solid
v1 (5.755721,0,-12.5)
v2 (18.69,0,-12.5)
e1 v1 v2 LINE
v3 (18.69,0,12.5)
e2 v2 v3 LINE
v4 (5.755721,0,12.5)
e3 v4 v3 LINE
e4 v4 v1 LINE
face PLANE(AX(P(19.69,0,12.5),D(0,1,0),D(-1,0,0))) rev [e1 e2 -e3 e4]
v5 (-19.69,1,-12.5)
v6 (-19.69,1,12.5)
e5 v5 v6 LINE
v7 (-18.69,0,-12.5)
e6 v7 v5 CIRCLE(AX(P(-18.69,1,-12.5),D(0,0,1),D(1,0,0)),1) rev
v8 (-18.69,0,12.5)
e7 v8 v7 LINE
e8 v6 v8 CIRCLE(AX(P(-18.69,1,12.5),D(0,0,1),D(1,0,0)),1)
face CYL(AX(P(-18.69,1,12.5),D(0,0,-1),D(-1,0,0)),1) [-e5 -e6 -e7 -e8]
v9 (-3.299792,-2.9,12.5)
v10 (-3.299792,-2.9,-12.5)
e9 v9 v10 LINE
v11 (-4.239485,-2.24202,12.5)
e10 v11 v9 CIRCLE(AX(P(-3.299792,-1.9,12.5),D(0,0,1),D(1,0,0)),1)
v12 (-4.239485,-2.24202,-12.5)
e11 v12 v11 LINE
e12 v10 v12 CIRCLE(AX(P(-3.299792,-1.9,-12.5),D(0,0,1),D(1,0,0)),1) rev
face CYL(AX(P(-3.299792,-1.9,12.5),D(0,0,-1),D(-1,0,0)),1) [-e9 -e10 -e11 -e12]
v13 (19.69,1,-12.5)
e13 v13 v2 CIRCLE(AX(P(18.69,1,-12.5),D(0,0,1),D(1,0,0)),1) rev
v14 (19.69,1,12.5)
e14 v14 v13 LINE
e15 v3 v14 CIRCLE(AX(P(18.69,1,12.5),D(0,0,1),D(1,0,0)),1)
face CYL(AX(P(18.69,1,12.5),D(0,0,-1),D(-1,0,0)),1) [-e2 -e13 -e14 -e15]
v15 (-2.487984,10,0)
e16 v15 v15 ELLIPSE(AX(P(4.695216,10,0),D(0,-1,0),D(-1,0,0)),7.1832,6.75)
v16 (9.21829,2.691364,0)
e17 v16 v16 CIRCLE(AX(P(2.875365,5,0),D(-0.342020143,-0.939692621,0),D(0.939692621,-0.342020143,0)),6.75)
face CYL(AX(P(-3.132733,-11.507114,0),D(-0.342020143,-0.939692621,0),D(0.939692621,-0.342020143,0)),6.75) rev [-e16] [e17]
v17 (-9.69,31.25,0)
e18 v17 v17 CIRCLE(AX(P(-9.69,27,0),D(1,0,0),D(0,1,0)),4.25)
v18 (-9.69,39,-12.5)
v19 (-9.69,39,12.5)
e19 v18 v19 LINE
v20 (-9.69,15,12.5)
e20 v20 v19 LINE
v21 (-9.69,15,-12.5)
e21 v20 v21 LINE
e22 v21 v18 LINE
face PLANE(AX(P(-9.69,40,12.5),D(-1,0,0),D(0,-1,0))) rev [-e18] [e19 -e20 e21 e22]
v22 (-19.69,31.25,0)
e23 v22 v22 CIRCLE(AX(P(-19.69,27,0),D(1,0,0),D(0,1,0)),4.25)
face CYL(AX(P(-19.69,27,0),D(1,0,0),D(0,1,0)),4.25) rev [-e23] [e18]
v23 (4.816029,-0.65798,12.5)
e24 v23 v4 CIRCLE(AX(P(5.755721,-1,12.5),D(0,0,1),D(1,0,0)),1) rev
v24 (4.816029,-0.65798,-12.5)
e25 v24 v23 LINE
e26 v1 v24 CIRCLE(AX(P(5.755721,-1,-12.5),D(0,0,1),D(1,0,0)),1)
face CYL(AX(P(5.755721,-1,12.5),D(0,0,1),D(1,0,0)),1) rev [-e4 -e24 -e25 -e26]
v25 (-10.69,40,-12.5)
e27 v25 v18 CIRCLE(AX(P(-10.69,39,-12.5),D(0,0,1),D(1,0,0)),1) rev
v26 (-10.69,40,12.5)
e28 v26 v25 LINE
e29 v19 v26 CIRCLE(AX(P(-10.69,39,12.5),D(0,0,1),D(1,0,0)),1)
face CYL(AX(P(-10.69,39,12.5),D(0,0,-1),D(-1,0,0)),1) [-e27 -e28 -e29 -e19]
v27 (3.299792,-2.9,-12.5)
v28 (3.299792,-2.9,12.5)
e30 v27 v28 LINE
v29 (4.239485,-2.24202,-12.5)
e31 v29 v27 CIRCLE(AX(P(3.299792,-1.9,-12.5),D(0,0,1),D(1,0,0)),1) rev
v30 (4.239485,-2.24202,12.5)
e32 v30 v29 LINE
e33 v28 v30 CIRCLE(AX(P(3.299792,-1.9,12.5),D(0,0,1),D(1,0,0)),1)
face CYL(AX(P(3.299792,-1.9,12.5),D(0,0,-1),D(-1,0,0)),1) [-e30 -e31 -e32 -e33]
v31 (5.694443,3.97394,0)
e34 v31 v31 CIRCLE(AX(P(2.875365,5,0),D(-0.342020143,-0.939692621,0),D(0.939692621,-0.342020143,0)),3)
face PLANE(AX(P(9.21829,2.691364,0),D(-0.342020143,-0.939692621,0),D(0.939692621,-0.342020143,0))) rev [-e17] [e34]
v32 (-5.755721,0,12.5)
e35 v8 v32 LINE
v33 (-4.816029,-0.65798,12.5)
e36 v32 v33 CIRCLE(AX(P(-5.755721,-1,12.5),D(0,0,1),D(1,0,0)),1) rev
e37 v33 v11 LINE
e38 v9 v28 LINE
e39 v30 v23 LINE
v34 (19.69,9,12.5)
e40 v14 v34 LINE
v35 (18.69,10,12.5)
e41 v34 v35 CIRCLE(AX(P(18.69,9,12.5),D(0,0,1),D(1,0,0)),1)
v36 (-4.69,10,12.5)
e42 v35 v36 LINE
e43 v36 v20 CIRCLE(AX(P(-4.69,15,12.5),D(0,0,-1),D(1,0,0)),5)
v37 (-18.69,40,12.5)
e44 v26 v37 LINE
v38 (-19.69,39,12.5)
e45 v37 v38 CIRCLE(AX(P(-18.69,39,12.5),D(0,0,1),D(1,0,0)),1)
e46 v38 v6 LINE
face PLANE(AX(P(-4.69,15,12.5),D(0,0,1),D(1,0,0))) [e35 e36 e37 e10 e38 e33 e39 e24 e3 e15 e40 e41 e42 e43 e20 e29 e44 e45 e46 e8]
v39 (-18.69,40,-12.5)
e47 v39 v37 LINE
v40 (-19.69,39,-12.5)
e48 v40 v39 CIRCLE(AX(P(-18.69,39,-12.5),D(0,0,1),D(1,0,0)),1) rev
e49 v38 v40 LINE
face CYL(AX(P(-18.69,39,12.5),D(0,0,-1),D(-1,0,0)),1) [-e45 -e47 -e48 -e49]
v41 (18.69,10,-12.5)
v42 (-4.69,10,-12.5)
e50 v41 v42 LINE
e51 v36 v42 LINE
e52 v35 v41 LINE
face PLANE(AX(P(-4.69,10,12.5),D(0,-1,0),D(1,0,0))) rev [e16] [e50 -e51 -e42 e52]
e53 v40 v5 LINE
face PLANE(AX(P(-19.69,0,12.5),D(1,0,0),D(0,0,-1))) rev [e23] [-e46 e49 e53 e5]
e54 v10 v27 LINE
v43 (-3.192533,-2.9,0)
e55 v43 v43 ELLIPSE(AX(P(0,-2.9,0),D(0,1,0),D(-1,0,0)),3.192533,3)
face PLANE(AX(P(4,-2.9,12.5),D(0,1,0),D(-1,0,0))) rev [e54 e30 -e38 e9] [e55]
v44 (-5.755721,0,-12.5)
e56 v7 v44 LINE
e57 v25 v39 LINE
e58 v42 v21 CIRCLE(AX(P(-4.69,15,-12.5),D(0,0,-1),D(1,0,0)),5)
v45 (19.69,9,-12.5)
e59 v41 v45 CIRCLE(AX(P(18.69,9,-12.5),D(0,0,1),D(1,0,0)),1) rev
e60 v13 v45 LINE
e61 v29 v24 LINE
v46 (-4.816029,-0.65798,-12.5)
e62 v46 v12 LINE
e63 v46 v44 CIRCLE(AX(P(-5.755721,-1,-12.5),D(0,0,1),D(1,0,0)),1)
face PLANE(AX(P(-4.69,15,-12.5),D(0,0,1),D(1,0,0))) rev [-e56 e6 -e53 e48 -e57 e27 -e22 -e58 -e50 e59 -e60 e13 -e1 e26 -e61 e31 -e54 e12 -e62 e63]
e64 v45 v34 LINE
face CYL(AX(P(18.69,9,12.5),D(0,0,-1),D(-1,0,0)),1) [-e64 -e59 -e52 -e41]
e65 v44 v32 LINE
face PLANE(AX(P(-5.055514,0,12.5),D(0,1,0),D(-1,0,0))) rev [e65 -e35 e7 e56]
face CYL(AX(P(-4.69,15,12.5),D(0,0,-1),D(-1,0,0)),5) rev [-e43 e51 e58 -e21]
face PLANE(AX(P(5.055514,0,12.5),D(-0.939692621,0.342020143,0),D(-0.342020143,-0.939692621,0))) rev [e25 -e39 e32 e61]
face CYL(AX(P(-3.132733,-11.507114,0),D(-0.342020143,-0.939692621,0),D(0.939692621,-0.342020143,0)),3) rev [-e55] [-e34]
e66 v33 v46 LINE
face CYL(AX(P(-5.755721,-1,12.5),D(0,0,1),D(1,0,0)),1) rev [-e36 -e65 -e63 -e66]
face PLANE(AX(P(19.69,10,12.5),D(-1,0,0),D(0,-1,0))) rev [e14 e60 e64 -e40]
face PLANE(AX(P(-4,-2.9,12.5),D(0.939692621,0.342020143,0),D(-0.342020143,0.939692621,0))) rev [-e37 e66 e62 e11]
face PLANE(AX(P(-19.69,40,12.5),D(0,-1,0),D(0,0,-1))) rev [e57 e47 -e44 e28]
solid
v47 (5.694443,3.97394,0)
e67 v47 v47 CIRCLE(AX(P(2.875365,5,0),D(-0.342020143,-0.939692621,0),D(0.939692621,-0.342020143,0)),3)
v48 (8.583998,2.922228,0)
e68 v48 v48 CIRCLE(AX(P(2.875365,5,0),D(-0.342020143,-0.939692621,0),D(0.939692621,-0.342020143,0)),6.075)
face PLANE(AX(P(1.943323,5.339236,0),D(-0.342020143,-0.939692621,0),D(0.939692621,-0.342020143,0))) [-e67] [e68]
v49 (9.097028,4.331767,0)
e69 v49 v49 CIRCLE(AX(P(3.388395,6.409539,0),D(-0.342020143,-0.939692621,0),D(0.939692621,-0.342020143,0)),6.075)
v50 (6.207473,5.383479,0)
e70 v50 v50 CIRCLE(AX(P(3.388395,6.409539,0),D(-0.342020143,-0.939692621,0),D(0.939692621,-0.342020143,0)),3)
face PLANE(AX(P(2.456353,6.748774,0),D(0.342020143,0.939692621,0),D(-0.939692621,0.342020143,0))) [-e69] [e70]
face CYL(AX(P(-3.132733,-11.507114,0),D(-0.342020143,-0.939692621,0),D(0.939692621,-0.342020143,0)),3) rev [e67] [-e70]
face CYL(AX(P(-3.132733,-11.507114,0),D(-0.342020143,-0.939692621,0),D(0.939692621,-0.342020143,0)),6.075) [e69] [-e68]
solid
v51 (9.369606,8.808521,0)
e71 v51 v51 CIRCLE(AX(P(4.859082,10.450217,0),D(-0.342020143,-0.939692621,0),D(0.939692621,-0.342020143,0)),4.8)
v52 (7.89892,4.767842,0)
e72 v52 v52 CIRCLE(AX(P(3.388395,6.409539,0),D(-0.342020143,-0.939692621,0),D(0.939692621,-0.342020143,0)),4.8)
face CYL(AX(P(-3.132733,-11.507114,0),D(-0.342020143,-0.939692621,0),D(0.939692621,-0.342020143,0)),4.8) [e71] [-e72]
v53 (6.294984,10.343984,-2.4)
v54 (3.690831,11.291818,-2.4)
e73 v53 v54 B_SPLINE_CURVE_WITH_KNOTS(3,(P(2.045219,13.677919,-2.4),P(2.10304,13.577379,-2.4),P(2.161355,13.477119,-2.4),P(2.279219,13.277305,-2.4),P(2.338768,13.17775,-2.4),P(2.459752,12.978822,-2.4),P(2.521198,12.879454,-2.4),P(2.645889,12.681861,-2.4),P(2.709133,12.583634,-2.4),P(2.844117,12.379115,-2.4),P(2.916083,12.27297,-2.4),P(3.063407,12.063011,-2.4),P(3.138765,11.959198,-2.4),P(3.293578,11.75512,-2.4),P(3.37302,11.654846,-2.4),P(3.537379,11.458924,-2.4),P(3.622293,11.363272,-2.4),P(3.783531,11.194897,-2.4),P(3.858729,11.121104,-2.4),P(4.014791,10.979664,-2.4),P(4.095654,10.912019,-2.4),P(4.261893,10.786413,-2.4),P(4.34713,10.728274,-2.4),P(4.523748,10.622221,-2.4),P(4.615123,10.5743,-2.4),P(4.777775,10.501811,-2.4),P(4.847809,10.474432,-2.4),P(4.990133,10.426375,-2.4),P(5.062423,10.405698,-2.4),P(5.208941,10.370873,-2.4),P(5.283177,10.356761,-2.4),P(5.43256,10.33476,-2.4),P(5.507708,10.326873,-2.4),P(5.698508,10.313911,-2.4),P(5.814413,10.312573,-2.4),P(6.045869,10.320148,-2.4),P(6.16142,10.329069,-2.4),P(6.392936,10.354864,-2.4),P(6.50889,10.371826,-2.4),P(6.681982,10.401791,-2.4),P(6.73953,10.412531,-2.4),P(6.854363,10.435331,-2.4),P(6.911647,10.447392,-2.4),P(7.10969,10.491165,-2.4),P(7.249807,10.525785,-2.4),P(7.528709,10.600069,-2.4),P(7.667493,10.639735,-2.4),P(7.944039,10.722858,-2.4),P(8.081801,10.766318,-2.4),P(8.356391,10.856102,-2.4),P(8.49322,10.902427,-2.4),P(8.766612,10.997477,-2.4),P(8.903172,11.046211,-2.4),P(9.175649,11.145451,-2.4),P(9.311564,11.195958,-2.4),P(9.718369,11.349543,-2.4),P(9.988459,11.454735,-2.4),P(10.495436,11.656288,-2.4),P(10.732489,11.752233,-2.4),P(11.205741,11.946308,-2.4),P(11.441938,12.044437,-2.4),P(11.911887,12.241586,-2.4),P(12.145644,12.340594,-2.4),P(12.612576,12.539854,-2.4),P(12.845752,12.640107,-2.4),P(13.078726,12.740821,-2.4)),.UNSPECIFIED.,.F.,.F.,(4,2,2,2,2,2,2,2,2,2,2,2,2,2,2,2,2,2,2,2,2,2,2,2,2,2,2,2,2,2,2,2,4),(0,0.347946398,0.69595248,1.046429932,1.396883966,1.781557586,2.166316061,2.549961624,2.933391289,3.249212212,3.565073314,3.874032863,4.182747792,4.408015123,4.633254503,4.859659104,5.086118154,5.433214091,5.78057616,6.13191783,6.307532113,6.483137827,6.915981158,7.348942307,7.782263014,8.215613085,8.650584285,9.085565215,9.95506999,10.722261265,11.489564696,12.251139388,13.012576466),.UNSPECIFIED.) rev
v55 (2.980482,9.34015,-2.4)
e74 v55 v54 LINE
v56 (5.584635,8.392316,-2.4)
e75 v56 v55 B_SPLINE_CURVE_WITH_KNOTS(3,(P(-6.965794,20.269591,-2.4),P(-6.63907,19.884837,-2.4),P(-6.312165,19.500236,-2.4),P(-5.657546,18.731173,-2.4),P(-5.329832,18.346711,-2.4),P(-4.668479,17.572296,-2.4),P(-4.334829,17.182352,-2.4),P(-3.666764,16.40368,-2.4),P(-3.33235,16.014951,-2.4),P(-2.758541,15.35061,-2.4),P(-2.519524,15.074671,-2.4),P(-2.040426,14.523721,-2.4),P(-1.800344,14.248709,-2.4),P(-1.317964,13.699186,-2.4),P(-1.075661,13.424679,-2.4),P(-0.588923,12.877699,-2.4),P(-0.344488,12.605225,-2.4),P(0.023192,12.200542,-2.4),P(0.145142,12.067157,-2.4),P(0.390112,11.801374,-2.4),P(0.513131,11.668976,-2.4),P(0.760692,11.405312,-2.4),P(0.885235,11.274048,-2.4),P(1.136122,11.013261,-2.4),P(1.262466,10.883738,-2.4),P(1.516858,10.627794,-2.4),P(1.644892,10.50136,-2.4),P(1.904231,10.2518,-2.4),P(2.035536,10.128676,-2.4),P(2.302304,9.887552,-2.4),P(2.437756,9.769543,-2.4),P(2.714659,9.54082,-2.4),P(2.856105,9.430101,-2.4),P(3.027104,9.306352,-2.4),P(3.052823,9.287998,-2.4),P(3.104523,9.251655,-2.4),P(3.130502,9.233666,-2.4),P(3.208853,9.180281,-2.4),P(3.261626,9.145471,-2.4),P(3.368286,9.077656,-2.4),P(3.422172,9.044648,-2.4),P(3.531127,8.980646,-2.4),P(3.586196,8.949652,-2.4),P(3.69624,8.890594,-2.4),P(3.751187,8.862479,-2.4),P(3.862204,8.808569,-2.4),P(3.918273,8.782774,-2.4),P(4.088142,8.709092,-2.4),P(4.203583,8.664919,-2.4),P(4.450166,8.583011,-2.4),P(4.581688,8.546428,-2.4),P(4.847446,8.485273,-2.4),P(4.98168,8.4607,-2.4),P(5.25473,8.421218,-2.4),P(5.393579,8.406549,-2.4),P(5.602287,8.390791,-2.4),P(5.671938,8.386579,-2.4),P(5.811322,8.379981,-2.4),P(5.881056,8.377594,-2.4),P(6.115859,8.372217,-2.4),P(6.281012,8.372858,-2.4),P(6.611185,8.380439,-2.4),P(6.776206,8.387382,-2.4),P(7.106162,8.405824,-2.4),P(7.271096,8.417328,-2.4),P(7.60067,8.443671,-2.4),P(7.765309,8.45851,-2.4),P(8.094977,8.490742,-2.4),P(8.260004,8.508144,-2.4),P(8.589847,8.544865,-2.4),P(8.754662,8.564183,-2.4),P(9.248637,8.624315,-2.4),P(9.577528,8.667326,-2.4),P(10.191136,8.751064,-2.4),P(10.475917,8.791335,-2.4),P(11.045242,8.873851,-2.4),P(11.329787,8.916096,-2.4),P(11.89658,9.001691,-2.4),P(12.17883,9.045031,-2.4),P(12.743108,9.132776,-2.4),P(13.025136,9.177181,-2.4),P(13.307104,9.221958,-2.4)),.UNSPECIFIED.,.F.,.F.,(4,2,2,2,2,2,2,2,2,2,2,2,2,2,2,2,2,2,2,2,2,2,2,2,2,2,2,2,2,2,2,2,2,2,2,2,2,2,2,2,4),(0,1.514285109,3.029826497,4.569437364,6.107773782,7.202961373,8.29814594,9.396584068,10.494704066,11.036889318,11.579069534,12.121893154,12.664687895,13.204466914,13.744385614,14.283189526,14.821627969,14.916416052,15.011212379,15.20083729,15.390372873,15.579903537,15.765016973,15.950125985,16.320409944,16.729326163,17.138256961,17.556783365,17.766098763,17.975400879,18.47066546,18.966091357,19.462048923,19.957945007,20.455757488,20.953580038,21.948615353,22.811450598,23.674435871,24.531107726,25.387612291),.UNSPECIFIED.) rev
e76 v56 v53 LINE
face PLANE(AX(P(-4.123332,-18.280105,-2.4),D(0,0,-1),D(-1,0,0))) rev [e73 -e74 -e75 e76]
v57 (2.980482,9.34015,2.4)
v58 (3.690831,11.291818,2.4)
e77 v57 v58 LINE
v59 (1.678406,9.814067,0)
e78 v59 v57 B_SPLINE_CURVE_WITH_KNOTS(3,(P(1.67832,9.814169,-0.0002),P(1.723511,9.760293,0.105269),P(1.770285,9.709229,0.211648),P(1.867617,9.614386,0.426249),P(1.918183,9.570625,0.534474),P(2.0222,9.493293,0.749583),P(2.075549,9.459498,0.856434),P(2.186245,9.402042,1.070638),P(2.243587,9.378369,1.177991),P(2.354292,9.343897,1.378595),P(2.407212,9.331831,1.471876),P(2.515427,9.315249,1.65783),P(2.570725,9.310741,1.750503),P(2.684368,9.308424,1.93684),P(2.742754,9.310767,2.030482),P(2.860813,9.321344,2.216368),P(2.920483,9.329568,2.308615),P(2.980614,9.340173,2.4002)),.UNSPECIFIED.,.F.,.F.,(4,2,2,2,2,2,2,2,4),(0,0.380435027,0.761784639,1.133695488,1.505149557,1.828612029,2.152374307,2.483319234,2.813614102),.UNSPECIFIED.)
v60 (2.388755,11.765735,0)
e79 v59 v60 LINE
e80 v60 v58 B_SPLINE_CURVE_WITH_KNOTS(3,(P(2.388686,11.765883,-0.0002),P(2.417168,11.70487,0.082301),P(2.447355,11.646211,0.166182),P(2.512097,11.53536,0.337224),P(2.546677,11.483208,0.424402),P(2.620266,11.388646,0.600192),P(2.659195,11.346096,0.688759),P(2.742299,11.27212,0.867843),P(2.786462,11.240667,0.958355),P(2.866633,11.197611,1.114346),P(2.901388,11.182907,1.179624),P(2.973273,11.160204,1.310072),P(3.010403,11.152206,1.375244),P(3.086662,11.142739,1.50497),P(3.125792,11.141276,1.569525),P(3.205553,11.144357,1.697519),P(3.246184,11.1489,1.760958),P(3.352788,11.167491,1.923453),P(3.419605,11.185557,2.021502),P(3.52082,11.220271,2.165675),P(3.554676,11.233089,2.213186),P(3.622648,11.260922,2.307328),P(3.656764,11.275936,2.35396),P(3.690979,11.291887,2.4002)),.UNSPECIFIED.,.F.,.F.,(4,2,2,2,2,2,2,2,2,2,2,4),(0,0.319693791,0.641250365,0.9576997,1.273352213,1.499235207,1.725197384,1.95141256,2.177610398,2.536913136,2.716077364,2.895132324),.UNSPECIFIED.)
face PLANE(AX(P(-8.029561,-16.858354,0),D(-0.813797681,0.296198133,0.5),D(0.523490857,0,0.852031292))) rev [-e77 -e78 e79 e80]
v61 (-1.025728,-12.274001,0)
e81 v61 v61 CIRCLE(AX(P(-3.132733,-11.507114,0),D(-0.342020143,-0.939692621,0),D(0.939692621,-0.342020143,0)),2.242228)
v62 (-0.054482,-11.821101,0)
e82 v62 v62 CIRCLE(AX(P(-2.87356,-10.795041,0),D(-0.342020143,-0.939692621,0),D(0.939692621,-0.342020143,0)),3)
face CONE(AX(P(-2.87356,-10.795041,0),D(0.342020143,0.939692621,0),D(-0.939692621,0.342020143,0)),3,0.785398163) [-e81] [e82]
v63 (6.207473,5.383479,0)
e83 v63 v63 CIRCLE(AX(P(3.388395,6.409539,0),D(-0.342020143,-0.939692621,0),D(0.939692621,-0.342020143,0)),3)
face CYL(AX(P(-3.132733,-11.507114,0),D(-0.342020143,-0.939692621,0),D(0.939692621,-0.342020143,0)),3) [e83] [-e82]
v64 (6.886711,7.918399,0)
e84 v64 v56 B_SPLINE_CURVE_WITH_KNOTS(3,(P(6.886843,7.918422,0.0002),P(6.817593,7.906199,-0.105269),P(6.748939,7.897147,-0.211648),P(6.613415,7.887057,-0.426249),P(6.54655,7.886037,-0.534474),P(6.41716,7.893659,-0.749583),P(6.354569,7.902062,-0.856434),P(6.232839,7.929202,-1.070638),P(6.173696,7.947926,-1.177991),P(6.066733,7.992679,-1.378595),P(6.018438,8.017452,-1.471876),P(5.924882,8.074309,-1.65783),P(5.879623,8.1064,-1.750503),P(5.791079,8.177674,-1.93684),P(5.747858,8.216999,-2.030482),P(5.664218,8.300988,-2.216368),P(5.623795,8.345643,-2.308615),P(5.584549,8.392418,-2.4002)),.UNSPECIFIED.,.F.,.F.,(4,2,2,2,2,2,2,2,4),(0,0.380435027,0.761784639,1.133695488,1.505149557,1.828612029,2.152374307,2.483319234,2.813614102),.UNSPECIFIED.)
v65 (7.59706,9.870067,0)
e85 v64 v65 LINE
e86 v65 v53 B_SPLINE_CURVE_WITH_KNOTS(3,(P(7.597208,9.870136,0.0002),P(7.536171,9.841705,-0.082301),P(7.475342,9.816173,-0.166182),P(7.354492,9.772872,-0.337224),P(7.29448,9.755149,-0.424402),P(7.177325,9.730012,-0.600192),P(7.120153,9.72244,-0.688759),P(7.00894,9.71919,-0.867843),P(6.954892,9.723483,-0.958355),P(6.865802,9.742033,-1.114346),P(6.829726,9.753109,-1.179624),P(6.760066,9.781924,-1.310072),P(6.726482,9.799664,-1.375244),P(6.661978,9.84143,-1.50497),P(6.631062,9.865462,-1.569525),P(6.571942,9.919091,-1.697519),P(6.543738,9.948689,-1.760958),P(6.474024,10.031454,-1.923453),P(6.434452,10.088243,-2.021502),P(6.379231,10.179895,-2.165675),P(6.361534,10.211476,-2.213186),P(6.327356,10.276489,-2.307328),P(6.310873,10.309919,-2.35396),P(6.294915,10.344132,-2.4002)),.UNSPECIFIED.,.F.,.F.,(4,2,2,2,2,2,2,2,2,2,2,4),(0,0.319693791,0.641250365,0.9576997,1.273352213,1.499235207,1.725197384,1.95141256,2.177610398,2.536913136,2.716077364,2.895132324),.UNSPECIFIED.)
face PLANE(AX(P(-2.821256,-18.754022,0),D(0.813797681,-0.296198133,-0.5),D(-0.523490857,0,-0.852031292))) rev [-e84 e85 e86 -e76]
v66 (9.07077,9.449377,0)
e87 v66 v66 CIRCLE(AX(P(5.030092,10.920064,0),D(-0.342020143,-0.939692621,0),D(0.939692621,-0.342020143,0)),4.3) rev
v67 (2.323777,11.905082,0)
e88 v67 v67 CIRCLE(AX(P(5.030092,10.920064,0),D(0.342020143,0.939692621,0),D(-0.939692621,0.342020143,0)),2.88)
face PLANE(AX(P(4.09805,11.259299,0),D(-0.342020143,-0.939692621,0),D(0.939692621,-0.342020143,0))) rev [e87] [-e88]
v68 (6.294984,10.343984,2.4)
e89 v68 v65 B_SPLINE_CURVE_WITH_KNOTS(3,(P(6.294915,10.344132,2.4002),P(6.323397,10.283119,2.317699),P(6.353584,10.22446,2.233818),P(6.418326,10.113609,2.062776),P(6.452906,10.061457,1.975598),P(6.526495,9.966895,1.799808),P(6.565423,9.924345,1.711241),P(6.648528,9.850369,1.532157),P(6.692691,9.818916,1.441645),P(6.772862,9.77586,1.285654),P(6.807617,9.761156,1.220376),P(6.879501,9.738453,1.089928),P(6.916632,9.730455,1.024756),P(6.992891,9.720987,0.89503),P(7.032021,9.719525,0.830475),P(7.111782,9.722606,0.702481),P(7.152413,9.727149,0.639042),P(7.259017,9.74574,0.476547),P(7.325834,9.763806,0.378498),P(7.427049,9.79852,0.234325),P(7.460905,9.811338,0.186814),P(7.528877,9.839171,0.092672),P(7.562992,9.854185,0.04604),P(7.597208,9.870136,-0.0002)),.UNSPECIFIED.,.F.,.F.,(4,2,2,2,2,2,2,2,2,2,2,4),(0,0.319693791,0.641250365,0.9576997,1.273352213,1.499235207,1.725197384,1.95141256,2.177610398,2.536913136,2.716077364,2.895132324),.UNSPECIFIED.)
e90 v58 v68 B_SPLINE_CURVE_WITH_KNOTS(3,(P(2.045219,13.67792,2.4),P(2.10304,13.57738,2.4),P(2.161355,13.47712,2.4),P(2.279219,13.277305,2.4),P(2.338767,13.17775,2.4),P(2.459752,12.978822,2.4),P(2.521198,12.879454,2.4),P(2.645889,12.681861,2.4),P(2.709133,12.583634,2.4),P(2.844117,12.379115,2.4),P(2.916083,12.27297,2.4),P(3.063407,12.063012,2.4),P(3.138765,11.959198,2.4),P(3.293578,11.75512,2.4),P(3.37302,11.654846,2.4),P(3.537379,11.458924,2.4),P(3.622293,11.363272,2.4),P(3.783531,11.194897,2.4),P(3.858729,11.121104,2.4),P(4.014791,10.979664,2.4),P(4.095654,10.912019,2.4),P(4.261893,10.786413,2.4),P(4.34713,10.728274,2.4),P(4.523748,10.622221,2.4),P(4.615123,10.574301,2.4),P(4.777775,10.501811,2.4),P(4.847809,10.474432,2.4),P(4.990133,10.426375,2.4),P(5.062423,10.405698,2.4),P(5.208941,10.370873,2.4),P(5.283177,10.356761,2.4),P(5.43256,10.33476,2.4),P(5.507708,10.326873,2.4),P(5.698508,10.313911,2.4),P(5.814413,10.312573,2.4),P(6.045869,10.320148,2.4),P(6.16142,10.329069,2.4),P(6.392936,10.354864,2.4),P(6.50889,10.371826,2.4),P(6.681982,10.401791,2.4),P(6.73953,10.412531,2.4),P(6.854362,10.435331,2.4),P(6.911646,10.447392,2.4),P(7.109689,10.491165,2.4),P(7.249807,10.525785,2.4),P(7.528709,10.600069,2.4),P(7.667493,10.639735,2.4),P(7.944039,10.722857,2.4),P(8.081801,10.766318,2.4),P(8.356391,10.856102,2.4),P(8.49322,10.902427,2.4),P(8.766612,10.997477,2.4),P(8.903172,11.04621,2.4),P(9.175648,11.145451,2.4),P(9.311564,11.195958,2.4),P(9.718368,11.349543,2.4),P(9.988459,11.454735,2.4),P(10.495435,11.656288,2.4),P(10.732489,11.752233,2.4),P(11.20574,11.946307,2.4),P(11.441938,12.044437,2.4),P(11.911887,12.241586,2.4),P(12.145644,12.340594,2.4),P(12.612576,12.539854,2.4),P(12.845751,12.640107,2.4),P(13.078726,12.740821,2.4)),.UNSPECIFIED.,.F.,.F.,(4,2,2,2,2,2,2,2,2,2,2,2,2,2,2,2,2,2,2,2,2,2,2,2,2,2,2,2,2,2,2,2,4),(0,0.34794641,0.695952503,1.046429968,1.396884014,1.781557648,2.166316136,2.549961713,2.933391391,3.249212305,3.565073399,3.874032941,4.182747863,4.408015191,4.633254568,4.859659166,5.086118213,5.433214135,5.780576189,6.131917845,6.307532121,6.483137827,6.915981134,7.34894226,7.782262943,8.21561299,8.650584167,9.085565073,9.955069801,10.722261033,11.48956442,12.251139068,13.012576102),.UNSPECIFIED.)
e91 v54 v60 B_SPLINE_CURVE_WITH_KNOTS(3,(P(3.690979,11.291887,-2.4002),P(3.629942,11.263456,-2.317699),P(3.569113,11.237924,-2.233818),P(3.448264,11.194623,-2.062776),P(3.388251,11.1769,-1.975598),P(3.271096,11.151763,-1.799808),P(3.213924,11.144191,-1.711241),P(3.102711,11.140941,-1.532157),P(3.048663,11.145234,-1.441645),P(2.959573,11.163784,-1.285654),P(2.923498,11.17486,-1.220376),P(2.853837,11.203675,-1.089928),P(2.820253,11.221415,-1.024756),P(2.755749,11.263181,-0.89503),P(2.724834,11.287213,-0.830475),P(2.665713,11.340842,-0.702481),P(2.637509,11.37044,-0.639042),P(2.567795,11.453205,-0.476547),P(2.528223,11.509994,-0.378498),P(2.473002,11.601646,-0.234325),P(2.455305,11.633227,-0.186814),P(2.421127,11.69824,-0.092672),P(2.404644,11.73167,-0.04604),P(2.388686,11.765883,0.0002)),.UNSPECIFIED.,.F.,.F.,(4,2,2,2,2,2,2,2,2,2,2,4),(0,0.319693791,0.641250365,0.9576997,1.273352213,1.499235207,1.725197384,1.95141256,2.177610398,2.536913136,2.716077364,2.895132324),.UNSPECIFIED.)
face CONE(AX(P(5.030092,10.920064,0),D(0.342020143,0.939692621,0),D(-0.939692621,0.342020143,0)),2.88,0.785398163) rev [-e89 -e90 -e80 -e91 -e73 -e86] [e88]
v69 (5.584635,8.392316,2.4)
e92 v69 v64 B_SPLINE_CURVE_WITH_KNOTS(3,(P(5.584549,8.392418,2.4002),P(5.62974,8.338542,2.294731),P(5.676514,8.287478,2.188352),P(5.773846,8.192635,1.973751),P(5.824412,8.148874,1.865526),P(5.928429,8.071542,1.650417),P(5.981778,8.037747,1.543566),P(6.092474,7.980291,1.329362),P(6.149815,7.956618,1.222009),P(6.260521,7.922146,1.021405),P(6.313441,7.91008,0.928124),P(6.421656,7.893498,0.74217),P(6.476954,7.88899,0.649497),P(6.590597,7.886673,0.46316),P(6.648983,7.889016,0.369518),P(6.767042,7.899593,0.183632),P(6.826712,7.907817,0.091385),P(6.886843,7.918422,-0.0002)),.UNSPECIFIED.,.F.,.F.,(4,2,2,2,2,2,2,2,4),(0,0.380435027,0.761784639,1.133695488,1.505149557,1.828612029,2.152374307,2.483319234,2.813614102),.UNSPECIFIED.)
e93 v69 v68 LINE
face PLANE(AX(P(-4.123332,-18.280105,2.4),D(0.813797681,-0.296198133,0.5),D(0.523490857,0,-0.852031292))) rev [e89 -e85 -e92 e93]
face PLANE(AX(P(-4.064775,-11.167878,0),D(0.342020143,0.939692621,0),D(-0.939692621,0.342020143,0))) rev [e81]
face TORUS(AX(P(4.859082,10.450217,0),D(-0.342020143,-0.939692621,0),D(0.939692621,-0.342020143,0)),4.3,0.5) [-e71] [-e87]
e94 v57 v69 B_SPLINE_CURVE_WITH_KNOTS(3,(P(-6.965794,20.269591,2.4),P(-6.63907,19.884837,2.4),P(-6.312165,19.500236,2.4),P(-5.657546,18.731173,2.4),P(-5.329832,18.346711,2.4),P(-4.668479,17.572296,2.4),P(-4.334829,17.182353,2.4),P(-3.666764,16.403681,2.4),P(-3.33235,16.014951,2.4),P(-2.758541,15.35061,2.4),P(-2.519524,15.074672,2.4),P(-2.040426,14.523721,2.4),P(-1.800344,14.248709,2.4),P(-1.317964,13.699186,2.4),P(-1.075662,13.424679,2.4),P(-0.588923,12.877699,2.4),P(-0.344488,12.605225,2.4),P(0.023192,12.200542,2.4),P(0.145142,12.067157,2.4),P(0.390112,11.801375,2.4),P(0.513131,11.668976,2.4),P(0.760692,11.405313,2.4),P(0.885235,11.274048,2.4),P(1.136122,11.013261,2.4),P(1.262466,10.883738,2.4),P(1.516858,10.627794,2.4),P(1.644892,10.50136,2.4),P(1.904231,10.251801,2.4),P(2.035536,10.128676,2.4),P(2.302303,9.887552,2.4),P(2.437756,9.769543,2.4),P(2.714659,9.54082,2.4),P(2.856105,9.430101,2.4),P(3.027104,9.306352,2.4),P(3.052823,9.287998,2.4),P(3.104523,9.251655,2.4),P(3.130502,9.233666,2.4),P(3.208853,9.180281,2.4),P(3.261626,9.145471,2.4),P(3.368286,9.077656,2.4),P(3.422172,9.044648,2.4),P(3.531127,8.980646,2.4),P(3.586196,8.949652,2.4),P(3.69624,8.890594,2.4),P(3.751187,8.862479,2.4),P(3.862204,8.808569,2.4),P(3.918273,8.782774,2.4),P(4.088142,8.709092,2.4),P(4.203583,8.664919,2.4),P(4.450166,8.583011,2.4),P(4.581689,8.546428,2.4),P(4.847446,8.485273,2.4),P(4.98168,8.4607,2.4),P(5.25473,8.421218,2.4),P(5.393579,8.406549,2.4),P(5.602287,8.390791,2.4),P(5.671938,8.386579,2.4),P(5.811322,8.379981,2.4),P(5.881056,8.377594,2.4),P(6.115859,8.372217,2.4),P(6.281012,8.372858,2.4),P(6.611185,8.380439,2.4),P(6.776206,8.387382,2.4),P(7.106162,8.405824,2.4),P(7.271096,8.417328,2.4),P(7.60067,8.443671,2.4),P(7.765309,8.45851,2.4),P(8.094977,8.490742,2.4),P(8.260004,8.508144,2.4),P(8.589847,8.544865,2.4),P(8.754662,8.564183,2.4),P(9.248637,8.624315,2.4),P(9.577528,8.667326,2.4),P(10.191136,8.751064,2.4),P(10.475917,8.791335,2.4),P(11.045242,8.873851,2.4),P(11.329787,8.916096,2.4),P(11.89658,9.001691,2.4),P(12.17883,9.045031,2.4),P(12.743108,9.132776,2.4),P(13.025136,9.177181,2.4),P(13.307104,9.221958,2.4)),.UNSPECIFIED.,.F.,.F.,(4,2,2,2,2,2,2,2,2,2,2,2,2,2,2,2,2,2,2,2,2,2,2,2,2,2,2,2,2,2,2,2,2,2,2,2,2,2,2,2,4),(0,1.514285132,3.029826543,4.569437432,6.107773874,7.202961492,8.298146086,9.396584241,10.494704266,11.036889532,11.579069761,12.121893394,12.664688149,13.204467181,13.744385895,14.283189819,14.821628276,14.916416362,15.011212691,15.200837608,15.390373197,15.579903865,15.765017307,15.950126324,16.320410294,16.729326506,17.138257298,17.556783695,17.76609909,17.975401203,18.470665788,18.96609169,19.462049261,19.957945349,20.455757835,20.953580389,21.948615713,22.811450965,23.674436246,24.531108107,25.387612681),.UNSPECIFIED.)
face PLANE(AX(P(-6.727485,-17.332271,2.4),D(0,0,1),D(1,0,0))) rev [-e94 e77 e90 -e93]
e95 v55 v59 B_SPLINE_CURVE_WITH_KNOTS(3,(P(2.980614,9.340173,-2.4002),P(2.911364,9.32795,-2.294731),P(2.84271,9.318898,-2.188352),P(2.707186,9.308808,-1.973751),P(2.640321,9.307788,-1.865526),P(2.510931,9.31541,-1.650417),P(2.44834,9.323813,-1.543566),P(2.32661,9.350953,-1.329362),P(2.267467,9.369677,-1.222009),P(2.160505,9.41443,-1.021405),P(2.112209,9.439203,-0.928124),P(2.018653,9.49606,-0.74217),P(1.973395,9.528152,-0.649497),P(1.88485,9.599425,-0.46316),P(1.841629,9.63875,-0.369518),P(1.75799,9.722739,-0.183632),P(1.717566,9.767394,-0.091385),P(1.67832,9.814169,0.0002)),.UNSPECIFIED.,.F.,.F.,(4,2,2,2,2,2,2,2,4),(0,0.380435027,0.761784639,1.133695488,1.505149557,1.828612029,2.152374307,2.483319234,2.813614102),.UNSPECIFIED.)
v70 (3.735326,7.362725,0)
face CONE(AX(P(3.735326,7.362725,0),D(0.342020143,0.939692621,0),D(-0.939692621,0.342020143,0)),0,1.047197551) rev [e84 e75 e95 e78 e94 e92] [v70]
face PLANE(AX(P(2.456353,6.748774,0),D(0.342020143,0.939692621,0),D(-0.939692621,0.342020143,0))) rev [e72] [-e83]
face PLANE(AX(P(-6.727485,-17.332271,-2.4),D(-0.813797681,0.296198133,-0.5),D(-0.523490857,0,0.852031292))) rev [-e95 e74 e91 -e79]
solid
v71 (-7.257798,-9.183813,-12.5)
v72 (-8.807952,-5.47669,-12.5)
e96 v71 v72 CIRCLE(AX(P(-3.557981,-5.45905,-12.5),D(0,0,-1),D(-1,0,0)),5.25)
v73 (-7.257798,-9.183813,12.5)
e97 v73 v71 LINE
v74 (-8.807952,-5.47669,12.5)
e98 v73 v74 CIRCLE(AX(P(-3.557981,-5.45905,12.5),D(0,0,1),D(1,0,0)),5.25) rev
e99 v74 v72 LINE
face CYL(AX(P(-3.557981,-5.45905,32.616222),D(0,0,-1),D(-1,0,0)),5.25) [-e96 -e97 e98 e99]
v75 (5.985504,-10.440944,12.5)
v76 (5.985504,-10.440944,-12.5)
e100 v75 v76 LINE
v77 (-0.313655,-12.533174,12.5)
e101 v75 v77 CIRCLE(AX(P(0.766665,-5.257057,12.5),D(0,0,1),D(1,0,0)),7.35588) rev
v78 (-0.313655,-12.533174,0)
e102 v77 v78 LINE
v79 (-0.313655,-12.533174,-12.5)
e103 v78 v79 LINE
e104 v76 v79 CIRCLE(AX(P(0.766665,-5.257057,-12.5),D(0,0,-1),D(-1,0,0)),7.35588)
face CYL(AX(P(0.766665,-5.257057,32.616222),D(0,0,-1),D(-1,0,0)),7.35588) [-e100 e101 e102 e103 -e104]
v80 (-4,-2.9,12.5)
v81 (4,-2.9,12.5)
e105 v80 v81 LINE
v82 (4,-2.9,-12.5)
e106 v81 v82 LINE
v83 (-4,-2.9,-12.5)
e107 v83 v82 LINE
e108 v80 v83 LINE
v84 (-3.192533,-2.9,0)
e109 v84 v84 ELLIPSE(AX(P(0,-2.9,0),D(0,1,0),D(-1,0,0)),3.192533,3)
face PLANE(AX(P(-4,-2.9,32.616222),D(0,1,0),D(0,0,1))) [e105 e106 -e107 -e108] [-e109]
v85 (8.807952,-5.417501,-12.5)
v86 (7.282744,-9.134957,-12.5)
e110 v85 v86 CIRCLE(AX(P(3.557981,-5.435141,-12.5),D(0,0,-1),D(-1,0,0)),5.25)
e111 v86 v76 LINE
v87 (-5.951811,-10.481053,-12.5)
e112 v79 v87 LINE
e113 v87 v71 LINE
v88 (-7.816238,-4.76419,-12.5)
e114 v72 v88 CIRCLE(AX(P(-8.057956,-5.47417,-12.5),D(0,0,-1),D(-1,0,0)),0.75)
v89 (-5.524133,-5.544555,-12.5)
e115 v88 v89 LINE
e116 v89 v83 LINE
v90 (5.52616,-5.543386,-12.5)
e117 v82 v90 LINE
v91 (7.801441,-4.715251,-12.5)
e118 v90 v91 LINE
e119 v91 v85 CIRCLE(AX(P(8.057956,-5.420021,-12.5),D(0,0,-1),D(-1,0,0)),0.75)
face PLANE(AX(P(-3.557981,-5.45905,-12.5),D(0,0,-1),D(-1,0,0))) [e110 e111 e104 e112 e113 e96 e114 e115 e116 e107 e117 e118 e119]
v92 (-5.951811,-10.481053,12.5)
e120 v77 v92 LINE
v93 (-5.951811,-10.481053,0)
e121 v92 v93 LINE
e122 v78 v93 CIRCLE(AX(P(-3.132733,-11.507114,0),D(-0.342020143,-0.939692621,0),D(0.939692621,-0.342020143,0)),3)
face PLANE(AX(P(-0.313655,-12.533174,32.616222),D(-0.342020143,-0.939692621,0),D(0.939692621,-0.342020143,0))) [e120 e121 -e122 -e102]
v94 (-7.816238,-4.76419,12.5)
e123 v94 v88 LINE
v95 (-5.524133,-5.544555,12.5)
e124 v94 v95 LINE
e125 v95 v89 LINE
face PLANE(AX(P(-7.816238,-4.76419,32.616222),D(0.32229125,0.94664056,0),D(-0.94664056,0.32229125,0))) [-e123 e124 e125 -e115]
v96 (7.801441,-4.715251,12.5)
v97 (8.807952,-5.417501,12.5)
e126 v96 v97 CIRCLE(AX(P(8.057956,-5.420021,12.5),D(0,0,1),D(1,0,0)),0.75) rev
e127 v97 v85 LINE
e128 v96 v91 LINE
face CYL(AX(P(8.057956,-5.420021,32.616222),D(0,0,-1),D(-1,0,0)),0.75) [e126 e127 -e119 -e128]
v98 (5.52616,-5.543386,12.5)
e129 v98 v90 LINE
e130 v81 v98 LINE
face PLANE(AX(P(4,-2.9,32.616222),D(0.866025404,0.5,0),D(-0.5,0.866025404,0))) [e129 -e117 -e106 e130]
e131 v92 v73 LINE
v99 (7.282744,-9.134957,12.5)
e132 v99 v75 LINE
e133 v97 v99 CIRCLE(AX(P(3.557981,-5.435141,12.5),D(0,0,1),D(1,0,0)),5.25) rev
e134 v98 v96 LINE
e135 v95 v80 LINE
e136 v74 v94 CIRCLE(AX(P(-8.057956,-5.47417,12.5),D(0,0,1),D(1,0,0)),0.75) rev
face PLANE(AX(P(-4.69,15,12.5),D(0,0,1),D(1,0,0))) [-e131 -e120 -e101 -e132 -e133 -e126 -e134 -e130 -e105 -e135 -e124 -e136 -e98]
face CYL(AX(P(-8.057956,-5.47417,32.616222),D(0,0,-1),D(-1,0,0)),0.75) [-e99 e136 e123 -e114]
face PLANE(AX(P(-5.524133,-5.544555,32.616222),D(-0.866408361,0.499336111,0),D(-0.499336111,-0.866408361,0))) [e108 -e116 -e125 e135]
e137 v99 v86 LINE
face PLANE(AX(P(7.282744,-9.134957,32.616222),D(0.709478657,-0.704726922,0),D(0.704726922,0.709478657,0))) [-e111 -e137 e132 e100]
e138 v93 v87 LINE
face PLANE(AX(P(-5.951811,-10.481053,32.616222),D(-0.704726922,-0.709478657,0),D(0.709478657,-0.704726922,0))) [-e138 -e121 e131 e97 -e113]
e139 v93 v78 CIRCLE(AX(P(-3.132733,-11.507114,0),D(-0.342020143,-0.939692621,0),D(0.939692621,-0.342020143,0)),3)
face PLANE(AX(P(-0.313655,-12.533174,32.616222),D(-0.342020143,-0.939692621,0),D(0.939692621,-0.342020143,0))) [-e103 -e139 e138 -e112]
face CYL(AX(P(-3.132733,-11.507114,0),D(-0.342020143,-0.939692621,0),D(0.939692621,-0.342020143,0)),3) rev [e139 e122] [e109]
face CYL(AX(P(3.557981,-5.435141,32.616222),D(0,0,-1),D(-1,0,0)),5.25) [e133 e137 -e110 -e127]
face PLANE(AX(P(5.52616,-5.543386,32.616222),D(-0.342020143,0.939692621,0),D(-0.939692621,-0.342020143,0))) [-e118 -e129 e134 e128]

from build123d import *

# Parameters (mm, degrees)
BOSS_EXTRUDE1_DEPTH  = 12.5
BOSS_EXTRUDE2_DEPTH  = 25
FILLET1_R            = 1
SKETCH5_R            = 4.25
CUT_EXTRUDE1_DEPTH   = 52.180410315
CUT_EXTRUDE2_START   = -2.185640545
CUT_EXTRUDE2_DEPTH   = 3.185640545
CUT_EXTRUDE2_START_2 = 9.581895702
CUT_EXTRUDE2_2_DEPTH = 0.214359555
FILLET2_R            = 0.5


with BuildPart() as part:
    # Sketch3 → Boss-Extrude1 (new, symmetric)
    with BuildSketch(Plane.XY):
        with BuildLine():
            Line((-19.69, 0), (-19.69, 40))
            Line((-19.69, 40), (-9.69, 40))
            Line((-9.69, 40), (-9.69, 15))
            ThreePointArc((-9.69, 15), (-8.225533906, 11.464466094), (-4.69, 10))
            Line((-4.69, 10), (19.69, 10))
            Line((19.69, 10), (19.69, 0))
            Line((19.69, 0), (5.055513679, 0))
            Line((5.055513679, 0), (4, -2.9))
            Line((4, -2.9), (-4, -2.9))
            Line((-4, -2.9), (-5.055513679, 0))
            Line((-5.055513679, 0), (-19.69, 0))
        make_face()
    extrude(amount=BOSS_EXTRUDE1_DEPTH, both=True)

    # Fillet1
    fillet1_edges = [part.edges().sort_by_distance(p)[0] for p in [
        (-19.69, 0, 0),
        (-19.69, 40, 0),
        (-9.69, 40, 0),
        (19.69, 10, 0),
        (19.69, 0, 0),
        (5.055513679, 0, 0),
        (4, -2.9, 0),
        (-4, -2.9, 0),
        (-5.055513679, 0, 0),
    ]]
    fillet(fillet1_edges, radius=FILLET1_R)

    # Sketch5 → Cut-Extrude1 (cut, through all)
    with BuildSketch(Plane(origin=(-9.69, 0, 0), x_dir=(0, 0, -1), z_dir=(1, 0, 0))):
        with Locations(Location((0, 27, 0), (0, 0, 90))):
            Circle(SKETCH5_R)
    extrude(amount=-CUT_EXTRUDE1_DEPTH, mode=Mode.SUBTRACT)


with BuildPart() as body_2:
    # Sketch4 → Boss-Extrude2 (new body)
    with BuildSketch(Plane(origin=(0, 0, -12.5), x_dir=(-1, 0, 0), z_dir=(0, 0, -1))):
        with BuildLine():
            Line((5.951811032, -10.481053216), (7.257797729, -9.183813367))
            ThreePointArc((7.257797729, -9.183813367), (8.40157105, -7.484424253), (8.807951751, -5.476690332))
            ThreePointArc((8.807951751, -5.476690332), (8.495563879, -4.8650732), (7.816237548, -4.764189924))
            Line((7.816237548, -4.764189924), (5.524133229, -5.544554929))
            Line((5.524133229, -5.544554929), (4, -2.9))
            Line((4, -2.9), (-4, -2.9))
            Line((-4, -2.9), (-5.52615963, -5.54338602))
            Line((-5.52615963, -5.54338602), (-7.801440877, -4.715251372))
            ThreePointArc((-7.801440877, -4.715251372), (-8.487105577, -4.804934967), (-8.807951751, -5.41750085))
            ThreePointArc((-8.807951751, -5.41750085), (-8.415072056, -7.427920287), (-7.282744336, -9.134957107))
            Line((-7.282744336, -9.134957107), (-5.985504487, -10.440943804))
            ThreePointArc((-5.985504487, -10.440943804), (-3.08532669, -12.237943633), (0.313655308, -12.533174076))
            Line((0.313655308, -12.533174076), (5.951811032, -10.481053216))
        make_face()
    extrude(amount=-BOSS_EXTRUDE2_DEPTH)


with BuildPart() as cut_revolve1_tool:
    # Sketch7 → Cut-Revolve1 (revolve)
    with BuildSketch(Plane.XY):
        Polygon((-3.13273317, -11.507113646), (5.535490796, 12.308635967), (11.878415986, 10), (9.218290041, 2.691364033), (5.694442713, 3.97393957), (-0.313655308, -12.533174076), align=None)
    revolve(axis=Axis((-3.13273317, -11.507113646, 0), (0.3420201433256561, 0.939692620785913, 0)))


with BuildPart() as part_1:
    add(part.part)

    # Cut-Revolve1: cut by cut_revolve1_tool
    add(cut_revolve1_tool.part, mode=Mode.SUBTRACT)


with BuildPart() as body_2_1:
    add(body_2.part)

    # Cut-Revolve1: cut by cut_revolve1_tool
    add(cut_revolve1_tool.part, mode=Mode.SUBTRACT)


with BuildPart() as body_3:
    # Sketch8 → Revolve1 (revolve)
    with BuildSketch(Plane.XY):
        Polygon((-1.025728279, -12.27400071), (-3.13273317, -11.507113646), (3.735326397, 7.362724931), (6.4645057, 7.843952877), (7.285354044, 10.099215167), (9.540616333, 9.278366823), (7.898919645, 4.767842243), (6.207472928, 5.383478501), (-0.054481942, -11.821101105), align=None)
    revolve(axis=Axis((-3.13273317, -11.507113646, 0), (0.34202014332565683, 0.9396926207859128, 0)))

    # Cut-Extrude2: read off the stored shape, not the designer's step
    # Cut-Extrude2 outline → Cut-Extrude2 (cut)
    with BuildSketch(Plane(origin=(4.09804972, 11.259299068, 0), x_dir=(0.9396926207859128, -0.34202014332565694, 0), z_dir=(0.3420201433256569, 0.9396926207859126, 0)).offset(CUT_EXTRUDE2_START)):
        with BuildLine():
            Line((-1.086593285, 1.200016053), (-1.779422876, 0))
            Line((-1.779422876, 0), (-1.086593285, -1.200016053))
            ThreePointArc((-1.086593285, -1.200016053), (-1.408141584, 0), (-1.086593285, 1.200016053))
        make_face()
        with BuildLine():
            ThreePointArc((0.991858416, -2.4), (-0.208133558, -2.078465603), (-1.086593285, -1.200016053))
            Line((-1.086593285, -1.200016053), (-0.39378223, -2.4))
            Line((-0.39378223, -2.4), (0.991858416, -2.4))
        make_face()
        with BuildLine():
            Line((-0.39378223, 2.4), (-1.086593285, 1.200016053))
            ThreePointArc((-1.086593285, 1.200016053), (-0.208133558, 2.078465603), (0.991858416, 2.4))
            Line((0.991858416, 2.4), (-0.39378223, 2.4))
        make_face()
        with BuildLine():
            ThreePointArc((3.070310117, -1.200016053), (2.19185039, -2.078465603), (0.991858416, -2.4))
            Line((0.991858416, -2.4), (2.377499062, -2.4))
            Line((2.377499062, -2.4), (3.070310117, -1.200016053))
        make_face()
        with BuildLine():
            Line((2.377499062, 2.4), (0.991858416, 2.4))
            ThreePointArc((0.991858416, 2.4), (2.19185039, 2.078465603), (3.070310117, 1.200016053))
            Line((3.070310117, 1.200016053), (2.377499062, 2.4))
        make_face()
        with BuildLine():
            ThreePointArc((3.070310117, 1.200016053), (3.391858416, 0), (3.070310117, -1.200016053))
            Line((3.070310117, -1.200016053), (3.763139708, 0))
            Line((3.763139708, 0), (3.070310117, 1.200016053))
        make_face()
    extrude(amount=CUT_EXTRUDE2_DEPTH, mode=Mode.SUBTRACT)

    # Cut-Extrude2 2 outline → Cut-Extrude2 2 (cut)
    with BuildSketch(Plane(origin=(0, 0, 0), x_dir=(0.9396926207859128, -0.34202014332565644, 0), z_dir=(0.34202014332565644, 0.9396926207859129, 0)).offset(CUT_EXTRUDE2_START_2)):
        with BuildLine():
            Line((-1.086593285, 1.200016053), (-1.779422876, 0))
            Line((-1.779422876, 0), (-1.086593285, -1.200016053))
            ThreePointArc((-1.086593285, -1.200016053), (-1.408141584, 0), (-1.086593285, 1.200016053))
        make_face()
        with BuildLine():
            ThreePointArc((0.991858416, -2.4), (-0.208133558, -2.078465603), (-1.086593285, -1.200016053))
            Line((-1.086593285, -1.200016053), (-0.39378223, -2.4))
            Line((-0.39378223, -2.4), (0.991858416, -2.4))
        make_face()
        with BuildLine():
            Line((-0.39378223, 2.4), (-1.086593285, 1.200016053))
            ThreePointArc((-1.086593285, 1.200016053), (-0.208133558, 2.078465603), (0.991858416, 2.4))
            Line((0.991858416, 2.4), (-0.39378223, 2.4))
        make_face()
        with BuildLine():
            ThreePointArc((3.070310117, -1.200016053), (2.19185039, -2.078465603), (0.991858416, -2.4))
            Line((0.991858416, -2.4), (2.377499062, -2.4))
            Line((2.377499062, -2.4), (3.070310117, -1.200016053))
        make_face()
        with BuildLine():
            Line((2.377499062, 2.4), (0.991858416, 2.4))
            ThreePointArc((0.991858416, 2.4), (2.19185039, 2.078465603), (3.070310117, 1.200016053))
            Line((3.070310117, 1.200016053), (2.377499062, 2.4))
        make_face()
        with BuildLine():
            ThreePointArc((3.070310117, 1.200016053), (3.391858416, 0), (3.070310117, -1.200016053))
            Line((3.070310117, -1.200016053), (3.763139708, 0))
            Line((3.763139708, 0), (3.070310117, 1.200016053))
        make_face()
    extrude(amount=CUT_EXTRUDE2_2_DEPTH, mode=Mode.SUBTRACT)

    # Cut-Extrude2 3 outline → Cut-Extrude2 3 (revolve)
    with BuildSketch(Plane(origin=(0.932042034, -0.339235557, 0), x_dir=(0.9396926207859126, -0.342020143325657, 0), z_dir=(0, 0, 1))):
        Polygon((2.771281293, 9.796255156), (2.399999957, 9.581895777), (2.771281292, 9.581895702), align=None)
    revolve(axis=Axis((0.932042034, -0.339235557, 0), (0.342020143325657, 0.9396926207859126, 0)))

    # Cut-Extrude3 cone 1 section (through the dimple's axis) → Cut-Extrude3 (revolve, cut)
    with BuildSketch(Plane(origin=(5.030091754, 10.920063511, 0), x_dir=(0, 0, 1), z_dir=(0.939692621, -0.342020143, 0))):
        Polygon((0, 0), (2.88, 0), (0, 2.88), align=None)
    revolve(axis=Axis((5.030091754, 10.920063511, 0), (-0.342020143, -0.939692621, 0)), mode=Mode.SUBTRACT)

    # Fillet2
    fillet2_edges = [body_3.edges().sort_by_distance(p)[0] for p in [
        (0.519567174, 12.561760199, 0),
    ]]
    fillet(fillet2_edges, radius=FILLET2_R)


with BuildPart() as body_4:
    # Sketch8<3> → Revolve2 (revolve)
    with BuildSketch(Plane.XY):
        Polygon((6.207472928, 5.383478501), (5.694442713, 3.97393957), (8.583997522, 2.922227629), (9.097027737, 4.33176656), (7.898919645, 4.767842243), align=None)
    revolve(axis=Axis((-3.13273317, -11.507113646, 0), (0.34202014332565683, 0.9396926207859128, 0)))


solid = Compound([part_1.part, body_2_1.part, body_3.part, body_4.part])
